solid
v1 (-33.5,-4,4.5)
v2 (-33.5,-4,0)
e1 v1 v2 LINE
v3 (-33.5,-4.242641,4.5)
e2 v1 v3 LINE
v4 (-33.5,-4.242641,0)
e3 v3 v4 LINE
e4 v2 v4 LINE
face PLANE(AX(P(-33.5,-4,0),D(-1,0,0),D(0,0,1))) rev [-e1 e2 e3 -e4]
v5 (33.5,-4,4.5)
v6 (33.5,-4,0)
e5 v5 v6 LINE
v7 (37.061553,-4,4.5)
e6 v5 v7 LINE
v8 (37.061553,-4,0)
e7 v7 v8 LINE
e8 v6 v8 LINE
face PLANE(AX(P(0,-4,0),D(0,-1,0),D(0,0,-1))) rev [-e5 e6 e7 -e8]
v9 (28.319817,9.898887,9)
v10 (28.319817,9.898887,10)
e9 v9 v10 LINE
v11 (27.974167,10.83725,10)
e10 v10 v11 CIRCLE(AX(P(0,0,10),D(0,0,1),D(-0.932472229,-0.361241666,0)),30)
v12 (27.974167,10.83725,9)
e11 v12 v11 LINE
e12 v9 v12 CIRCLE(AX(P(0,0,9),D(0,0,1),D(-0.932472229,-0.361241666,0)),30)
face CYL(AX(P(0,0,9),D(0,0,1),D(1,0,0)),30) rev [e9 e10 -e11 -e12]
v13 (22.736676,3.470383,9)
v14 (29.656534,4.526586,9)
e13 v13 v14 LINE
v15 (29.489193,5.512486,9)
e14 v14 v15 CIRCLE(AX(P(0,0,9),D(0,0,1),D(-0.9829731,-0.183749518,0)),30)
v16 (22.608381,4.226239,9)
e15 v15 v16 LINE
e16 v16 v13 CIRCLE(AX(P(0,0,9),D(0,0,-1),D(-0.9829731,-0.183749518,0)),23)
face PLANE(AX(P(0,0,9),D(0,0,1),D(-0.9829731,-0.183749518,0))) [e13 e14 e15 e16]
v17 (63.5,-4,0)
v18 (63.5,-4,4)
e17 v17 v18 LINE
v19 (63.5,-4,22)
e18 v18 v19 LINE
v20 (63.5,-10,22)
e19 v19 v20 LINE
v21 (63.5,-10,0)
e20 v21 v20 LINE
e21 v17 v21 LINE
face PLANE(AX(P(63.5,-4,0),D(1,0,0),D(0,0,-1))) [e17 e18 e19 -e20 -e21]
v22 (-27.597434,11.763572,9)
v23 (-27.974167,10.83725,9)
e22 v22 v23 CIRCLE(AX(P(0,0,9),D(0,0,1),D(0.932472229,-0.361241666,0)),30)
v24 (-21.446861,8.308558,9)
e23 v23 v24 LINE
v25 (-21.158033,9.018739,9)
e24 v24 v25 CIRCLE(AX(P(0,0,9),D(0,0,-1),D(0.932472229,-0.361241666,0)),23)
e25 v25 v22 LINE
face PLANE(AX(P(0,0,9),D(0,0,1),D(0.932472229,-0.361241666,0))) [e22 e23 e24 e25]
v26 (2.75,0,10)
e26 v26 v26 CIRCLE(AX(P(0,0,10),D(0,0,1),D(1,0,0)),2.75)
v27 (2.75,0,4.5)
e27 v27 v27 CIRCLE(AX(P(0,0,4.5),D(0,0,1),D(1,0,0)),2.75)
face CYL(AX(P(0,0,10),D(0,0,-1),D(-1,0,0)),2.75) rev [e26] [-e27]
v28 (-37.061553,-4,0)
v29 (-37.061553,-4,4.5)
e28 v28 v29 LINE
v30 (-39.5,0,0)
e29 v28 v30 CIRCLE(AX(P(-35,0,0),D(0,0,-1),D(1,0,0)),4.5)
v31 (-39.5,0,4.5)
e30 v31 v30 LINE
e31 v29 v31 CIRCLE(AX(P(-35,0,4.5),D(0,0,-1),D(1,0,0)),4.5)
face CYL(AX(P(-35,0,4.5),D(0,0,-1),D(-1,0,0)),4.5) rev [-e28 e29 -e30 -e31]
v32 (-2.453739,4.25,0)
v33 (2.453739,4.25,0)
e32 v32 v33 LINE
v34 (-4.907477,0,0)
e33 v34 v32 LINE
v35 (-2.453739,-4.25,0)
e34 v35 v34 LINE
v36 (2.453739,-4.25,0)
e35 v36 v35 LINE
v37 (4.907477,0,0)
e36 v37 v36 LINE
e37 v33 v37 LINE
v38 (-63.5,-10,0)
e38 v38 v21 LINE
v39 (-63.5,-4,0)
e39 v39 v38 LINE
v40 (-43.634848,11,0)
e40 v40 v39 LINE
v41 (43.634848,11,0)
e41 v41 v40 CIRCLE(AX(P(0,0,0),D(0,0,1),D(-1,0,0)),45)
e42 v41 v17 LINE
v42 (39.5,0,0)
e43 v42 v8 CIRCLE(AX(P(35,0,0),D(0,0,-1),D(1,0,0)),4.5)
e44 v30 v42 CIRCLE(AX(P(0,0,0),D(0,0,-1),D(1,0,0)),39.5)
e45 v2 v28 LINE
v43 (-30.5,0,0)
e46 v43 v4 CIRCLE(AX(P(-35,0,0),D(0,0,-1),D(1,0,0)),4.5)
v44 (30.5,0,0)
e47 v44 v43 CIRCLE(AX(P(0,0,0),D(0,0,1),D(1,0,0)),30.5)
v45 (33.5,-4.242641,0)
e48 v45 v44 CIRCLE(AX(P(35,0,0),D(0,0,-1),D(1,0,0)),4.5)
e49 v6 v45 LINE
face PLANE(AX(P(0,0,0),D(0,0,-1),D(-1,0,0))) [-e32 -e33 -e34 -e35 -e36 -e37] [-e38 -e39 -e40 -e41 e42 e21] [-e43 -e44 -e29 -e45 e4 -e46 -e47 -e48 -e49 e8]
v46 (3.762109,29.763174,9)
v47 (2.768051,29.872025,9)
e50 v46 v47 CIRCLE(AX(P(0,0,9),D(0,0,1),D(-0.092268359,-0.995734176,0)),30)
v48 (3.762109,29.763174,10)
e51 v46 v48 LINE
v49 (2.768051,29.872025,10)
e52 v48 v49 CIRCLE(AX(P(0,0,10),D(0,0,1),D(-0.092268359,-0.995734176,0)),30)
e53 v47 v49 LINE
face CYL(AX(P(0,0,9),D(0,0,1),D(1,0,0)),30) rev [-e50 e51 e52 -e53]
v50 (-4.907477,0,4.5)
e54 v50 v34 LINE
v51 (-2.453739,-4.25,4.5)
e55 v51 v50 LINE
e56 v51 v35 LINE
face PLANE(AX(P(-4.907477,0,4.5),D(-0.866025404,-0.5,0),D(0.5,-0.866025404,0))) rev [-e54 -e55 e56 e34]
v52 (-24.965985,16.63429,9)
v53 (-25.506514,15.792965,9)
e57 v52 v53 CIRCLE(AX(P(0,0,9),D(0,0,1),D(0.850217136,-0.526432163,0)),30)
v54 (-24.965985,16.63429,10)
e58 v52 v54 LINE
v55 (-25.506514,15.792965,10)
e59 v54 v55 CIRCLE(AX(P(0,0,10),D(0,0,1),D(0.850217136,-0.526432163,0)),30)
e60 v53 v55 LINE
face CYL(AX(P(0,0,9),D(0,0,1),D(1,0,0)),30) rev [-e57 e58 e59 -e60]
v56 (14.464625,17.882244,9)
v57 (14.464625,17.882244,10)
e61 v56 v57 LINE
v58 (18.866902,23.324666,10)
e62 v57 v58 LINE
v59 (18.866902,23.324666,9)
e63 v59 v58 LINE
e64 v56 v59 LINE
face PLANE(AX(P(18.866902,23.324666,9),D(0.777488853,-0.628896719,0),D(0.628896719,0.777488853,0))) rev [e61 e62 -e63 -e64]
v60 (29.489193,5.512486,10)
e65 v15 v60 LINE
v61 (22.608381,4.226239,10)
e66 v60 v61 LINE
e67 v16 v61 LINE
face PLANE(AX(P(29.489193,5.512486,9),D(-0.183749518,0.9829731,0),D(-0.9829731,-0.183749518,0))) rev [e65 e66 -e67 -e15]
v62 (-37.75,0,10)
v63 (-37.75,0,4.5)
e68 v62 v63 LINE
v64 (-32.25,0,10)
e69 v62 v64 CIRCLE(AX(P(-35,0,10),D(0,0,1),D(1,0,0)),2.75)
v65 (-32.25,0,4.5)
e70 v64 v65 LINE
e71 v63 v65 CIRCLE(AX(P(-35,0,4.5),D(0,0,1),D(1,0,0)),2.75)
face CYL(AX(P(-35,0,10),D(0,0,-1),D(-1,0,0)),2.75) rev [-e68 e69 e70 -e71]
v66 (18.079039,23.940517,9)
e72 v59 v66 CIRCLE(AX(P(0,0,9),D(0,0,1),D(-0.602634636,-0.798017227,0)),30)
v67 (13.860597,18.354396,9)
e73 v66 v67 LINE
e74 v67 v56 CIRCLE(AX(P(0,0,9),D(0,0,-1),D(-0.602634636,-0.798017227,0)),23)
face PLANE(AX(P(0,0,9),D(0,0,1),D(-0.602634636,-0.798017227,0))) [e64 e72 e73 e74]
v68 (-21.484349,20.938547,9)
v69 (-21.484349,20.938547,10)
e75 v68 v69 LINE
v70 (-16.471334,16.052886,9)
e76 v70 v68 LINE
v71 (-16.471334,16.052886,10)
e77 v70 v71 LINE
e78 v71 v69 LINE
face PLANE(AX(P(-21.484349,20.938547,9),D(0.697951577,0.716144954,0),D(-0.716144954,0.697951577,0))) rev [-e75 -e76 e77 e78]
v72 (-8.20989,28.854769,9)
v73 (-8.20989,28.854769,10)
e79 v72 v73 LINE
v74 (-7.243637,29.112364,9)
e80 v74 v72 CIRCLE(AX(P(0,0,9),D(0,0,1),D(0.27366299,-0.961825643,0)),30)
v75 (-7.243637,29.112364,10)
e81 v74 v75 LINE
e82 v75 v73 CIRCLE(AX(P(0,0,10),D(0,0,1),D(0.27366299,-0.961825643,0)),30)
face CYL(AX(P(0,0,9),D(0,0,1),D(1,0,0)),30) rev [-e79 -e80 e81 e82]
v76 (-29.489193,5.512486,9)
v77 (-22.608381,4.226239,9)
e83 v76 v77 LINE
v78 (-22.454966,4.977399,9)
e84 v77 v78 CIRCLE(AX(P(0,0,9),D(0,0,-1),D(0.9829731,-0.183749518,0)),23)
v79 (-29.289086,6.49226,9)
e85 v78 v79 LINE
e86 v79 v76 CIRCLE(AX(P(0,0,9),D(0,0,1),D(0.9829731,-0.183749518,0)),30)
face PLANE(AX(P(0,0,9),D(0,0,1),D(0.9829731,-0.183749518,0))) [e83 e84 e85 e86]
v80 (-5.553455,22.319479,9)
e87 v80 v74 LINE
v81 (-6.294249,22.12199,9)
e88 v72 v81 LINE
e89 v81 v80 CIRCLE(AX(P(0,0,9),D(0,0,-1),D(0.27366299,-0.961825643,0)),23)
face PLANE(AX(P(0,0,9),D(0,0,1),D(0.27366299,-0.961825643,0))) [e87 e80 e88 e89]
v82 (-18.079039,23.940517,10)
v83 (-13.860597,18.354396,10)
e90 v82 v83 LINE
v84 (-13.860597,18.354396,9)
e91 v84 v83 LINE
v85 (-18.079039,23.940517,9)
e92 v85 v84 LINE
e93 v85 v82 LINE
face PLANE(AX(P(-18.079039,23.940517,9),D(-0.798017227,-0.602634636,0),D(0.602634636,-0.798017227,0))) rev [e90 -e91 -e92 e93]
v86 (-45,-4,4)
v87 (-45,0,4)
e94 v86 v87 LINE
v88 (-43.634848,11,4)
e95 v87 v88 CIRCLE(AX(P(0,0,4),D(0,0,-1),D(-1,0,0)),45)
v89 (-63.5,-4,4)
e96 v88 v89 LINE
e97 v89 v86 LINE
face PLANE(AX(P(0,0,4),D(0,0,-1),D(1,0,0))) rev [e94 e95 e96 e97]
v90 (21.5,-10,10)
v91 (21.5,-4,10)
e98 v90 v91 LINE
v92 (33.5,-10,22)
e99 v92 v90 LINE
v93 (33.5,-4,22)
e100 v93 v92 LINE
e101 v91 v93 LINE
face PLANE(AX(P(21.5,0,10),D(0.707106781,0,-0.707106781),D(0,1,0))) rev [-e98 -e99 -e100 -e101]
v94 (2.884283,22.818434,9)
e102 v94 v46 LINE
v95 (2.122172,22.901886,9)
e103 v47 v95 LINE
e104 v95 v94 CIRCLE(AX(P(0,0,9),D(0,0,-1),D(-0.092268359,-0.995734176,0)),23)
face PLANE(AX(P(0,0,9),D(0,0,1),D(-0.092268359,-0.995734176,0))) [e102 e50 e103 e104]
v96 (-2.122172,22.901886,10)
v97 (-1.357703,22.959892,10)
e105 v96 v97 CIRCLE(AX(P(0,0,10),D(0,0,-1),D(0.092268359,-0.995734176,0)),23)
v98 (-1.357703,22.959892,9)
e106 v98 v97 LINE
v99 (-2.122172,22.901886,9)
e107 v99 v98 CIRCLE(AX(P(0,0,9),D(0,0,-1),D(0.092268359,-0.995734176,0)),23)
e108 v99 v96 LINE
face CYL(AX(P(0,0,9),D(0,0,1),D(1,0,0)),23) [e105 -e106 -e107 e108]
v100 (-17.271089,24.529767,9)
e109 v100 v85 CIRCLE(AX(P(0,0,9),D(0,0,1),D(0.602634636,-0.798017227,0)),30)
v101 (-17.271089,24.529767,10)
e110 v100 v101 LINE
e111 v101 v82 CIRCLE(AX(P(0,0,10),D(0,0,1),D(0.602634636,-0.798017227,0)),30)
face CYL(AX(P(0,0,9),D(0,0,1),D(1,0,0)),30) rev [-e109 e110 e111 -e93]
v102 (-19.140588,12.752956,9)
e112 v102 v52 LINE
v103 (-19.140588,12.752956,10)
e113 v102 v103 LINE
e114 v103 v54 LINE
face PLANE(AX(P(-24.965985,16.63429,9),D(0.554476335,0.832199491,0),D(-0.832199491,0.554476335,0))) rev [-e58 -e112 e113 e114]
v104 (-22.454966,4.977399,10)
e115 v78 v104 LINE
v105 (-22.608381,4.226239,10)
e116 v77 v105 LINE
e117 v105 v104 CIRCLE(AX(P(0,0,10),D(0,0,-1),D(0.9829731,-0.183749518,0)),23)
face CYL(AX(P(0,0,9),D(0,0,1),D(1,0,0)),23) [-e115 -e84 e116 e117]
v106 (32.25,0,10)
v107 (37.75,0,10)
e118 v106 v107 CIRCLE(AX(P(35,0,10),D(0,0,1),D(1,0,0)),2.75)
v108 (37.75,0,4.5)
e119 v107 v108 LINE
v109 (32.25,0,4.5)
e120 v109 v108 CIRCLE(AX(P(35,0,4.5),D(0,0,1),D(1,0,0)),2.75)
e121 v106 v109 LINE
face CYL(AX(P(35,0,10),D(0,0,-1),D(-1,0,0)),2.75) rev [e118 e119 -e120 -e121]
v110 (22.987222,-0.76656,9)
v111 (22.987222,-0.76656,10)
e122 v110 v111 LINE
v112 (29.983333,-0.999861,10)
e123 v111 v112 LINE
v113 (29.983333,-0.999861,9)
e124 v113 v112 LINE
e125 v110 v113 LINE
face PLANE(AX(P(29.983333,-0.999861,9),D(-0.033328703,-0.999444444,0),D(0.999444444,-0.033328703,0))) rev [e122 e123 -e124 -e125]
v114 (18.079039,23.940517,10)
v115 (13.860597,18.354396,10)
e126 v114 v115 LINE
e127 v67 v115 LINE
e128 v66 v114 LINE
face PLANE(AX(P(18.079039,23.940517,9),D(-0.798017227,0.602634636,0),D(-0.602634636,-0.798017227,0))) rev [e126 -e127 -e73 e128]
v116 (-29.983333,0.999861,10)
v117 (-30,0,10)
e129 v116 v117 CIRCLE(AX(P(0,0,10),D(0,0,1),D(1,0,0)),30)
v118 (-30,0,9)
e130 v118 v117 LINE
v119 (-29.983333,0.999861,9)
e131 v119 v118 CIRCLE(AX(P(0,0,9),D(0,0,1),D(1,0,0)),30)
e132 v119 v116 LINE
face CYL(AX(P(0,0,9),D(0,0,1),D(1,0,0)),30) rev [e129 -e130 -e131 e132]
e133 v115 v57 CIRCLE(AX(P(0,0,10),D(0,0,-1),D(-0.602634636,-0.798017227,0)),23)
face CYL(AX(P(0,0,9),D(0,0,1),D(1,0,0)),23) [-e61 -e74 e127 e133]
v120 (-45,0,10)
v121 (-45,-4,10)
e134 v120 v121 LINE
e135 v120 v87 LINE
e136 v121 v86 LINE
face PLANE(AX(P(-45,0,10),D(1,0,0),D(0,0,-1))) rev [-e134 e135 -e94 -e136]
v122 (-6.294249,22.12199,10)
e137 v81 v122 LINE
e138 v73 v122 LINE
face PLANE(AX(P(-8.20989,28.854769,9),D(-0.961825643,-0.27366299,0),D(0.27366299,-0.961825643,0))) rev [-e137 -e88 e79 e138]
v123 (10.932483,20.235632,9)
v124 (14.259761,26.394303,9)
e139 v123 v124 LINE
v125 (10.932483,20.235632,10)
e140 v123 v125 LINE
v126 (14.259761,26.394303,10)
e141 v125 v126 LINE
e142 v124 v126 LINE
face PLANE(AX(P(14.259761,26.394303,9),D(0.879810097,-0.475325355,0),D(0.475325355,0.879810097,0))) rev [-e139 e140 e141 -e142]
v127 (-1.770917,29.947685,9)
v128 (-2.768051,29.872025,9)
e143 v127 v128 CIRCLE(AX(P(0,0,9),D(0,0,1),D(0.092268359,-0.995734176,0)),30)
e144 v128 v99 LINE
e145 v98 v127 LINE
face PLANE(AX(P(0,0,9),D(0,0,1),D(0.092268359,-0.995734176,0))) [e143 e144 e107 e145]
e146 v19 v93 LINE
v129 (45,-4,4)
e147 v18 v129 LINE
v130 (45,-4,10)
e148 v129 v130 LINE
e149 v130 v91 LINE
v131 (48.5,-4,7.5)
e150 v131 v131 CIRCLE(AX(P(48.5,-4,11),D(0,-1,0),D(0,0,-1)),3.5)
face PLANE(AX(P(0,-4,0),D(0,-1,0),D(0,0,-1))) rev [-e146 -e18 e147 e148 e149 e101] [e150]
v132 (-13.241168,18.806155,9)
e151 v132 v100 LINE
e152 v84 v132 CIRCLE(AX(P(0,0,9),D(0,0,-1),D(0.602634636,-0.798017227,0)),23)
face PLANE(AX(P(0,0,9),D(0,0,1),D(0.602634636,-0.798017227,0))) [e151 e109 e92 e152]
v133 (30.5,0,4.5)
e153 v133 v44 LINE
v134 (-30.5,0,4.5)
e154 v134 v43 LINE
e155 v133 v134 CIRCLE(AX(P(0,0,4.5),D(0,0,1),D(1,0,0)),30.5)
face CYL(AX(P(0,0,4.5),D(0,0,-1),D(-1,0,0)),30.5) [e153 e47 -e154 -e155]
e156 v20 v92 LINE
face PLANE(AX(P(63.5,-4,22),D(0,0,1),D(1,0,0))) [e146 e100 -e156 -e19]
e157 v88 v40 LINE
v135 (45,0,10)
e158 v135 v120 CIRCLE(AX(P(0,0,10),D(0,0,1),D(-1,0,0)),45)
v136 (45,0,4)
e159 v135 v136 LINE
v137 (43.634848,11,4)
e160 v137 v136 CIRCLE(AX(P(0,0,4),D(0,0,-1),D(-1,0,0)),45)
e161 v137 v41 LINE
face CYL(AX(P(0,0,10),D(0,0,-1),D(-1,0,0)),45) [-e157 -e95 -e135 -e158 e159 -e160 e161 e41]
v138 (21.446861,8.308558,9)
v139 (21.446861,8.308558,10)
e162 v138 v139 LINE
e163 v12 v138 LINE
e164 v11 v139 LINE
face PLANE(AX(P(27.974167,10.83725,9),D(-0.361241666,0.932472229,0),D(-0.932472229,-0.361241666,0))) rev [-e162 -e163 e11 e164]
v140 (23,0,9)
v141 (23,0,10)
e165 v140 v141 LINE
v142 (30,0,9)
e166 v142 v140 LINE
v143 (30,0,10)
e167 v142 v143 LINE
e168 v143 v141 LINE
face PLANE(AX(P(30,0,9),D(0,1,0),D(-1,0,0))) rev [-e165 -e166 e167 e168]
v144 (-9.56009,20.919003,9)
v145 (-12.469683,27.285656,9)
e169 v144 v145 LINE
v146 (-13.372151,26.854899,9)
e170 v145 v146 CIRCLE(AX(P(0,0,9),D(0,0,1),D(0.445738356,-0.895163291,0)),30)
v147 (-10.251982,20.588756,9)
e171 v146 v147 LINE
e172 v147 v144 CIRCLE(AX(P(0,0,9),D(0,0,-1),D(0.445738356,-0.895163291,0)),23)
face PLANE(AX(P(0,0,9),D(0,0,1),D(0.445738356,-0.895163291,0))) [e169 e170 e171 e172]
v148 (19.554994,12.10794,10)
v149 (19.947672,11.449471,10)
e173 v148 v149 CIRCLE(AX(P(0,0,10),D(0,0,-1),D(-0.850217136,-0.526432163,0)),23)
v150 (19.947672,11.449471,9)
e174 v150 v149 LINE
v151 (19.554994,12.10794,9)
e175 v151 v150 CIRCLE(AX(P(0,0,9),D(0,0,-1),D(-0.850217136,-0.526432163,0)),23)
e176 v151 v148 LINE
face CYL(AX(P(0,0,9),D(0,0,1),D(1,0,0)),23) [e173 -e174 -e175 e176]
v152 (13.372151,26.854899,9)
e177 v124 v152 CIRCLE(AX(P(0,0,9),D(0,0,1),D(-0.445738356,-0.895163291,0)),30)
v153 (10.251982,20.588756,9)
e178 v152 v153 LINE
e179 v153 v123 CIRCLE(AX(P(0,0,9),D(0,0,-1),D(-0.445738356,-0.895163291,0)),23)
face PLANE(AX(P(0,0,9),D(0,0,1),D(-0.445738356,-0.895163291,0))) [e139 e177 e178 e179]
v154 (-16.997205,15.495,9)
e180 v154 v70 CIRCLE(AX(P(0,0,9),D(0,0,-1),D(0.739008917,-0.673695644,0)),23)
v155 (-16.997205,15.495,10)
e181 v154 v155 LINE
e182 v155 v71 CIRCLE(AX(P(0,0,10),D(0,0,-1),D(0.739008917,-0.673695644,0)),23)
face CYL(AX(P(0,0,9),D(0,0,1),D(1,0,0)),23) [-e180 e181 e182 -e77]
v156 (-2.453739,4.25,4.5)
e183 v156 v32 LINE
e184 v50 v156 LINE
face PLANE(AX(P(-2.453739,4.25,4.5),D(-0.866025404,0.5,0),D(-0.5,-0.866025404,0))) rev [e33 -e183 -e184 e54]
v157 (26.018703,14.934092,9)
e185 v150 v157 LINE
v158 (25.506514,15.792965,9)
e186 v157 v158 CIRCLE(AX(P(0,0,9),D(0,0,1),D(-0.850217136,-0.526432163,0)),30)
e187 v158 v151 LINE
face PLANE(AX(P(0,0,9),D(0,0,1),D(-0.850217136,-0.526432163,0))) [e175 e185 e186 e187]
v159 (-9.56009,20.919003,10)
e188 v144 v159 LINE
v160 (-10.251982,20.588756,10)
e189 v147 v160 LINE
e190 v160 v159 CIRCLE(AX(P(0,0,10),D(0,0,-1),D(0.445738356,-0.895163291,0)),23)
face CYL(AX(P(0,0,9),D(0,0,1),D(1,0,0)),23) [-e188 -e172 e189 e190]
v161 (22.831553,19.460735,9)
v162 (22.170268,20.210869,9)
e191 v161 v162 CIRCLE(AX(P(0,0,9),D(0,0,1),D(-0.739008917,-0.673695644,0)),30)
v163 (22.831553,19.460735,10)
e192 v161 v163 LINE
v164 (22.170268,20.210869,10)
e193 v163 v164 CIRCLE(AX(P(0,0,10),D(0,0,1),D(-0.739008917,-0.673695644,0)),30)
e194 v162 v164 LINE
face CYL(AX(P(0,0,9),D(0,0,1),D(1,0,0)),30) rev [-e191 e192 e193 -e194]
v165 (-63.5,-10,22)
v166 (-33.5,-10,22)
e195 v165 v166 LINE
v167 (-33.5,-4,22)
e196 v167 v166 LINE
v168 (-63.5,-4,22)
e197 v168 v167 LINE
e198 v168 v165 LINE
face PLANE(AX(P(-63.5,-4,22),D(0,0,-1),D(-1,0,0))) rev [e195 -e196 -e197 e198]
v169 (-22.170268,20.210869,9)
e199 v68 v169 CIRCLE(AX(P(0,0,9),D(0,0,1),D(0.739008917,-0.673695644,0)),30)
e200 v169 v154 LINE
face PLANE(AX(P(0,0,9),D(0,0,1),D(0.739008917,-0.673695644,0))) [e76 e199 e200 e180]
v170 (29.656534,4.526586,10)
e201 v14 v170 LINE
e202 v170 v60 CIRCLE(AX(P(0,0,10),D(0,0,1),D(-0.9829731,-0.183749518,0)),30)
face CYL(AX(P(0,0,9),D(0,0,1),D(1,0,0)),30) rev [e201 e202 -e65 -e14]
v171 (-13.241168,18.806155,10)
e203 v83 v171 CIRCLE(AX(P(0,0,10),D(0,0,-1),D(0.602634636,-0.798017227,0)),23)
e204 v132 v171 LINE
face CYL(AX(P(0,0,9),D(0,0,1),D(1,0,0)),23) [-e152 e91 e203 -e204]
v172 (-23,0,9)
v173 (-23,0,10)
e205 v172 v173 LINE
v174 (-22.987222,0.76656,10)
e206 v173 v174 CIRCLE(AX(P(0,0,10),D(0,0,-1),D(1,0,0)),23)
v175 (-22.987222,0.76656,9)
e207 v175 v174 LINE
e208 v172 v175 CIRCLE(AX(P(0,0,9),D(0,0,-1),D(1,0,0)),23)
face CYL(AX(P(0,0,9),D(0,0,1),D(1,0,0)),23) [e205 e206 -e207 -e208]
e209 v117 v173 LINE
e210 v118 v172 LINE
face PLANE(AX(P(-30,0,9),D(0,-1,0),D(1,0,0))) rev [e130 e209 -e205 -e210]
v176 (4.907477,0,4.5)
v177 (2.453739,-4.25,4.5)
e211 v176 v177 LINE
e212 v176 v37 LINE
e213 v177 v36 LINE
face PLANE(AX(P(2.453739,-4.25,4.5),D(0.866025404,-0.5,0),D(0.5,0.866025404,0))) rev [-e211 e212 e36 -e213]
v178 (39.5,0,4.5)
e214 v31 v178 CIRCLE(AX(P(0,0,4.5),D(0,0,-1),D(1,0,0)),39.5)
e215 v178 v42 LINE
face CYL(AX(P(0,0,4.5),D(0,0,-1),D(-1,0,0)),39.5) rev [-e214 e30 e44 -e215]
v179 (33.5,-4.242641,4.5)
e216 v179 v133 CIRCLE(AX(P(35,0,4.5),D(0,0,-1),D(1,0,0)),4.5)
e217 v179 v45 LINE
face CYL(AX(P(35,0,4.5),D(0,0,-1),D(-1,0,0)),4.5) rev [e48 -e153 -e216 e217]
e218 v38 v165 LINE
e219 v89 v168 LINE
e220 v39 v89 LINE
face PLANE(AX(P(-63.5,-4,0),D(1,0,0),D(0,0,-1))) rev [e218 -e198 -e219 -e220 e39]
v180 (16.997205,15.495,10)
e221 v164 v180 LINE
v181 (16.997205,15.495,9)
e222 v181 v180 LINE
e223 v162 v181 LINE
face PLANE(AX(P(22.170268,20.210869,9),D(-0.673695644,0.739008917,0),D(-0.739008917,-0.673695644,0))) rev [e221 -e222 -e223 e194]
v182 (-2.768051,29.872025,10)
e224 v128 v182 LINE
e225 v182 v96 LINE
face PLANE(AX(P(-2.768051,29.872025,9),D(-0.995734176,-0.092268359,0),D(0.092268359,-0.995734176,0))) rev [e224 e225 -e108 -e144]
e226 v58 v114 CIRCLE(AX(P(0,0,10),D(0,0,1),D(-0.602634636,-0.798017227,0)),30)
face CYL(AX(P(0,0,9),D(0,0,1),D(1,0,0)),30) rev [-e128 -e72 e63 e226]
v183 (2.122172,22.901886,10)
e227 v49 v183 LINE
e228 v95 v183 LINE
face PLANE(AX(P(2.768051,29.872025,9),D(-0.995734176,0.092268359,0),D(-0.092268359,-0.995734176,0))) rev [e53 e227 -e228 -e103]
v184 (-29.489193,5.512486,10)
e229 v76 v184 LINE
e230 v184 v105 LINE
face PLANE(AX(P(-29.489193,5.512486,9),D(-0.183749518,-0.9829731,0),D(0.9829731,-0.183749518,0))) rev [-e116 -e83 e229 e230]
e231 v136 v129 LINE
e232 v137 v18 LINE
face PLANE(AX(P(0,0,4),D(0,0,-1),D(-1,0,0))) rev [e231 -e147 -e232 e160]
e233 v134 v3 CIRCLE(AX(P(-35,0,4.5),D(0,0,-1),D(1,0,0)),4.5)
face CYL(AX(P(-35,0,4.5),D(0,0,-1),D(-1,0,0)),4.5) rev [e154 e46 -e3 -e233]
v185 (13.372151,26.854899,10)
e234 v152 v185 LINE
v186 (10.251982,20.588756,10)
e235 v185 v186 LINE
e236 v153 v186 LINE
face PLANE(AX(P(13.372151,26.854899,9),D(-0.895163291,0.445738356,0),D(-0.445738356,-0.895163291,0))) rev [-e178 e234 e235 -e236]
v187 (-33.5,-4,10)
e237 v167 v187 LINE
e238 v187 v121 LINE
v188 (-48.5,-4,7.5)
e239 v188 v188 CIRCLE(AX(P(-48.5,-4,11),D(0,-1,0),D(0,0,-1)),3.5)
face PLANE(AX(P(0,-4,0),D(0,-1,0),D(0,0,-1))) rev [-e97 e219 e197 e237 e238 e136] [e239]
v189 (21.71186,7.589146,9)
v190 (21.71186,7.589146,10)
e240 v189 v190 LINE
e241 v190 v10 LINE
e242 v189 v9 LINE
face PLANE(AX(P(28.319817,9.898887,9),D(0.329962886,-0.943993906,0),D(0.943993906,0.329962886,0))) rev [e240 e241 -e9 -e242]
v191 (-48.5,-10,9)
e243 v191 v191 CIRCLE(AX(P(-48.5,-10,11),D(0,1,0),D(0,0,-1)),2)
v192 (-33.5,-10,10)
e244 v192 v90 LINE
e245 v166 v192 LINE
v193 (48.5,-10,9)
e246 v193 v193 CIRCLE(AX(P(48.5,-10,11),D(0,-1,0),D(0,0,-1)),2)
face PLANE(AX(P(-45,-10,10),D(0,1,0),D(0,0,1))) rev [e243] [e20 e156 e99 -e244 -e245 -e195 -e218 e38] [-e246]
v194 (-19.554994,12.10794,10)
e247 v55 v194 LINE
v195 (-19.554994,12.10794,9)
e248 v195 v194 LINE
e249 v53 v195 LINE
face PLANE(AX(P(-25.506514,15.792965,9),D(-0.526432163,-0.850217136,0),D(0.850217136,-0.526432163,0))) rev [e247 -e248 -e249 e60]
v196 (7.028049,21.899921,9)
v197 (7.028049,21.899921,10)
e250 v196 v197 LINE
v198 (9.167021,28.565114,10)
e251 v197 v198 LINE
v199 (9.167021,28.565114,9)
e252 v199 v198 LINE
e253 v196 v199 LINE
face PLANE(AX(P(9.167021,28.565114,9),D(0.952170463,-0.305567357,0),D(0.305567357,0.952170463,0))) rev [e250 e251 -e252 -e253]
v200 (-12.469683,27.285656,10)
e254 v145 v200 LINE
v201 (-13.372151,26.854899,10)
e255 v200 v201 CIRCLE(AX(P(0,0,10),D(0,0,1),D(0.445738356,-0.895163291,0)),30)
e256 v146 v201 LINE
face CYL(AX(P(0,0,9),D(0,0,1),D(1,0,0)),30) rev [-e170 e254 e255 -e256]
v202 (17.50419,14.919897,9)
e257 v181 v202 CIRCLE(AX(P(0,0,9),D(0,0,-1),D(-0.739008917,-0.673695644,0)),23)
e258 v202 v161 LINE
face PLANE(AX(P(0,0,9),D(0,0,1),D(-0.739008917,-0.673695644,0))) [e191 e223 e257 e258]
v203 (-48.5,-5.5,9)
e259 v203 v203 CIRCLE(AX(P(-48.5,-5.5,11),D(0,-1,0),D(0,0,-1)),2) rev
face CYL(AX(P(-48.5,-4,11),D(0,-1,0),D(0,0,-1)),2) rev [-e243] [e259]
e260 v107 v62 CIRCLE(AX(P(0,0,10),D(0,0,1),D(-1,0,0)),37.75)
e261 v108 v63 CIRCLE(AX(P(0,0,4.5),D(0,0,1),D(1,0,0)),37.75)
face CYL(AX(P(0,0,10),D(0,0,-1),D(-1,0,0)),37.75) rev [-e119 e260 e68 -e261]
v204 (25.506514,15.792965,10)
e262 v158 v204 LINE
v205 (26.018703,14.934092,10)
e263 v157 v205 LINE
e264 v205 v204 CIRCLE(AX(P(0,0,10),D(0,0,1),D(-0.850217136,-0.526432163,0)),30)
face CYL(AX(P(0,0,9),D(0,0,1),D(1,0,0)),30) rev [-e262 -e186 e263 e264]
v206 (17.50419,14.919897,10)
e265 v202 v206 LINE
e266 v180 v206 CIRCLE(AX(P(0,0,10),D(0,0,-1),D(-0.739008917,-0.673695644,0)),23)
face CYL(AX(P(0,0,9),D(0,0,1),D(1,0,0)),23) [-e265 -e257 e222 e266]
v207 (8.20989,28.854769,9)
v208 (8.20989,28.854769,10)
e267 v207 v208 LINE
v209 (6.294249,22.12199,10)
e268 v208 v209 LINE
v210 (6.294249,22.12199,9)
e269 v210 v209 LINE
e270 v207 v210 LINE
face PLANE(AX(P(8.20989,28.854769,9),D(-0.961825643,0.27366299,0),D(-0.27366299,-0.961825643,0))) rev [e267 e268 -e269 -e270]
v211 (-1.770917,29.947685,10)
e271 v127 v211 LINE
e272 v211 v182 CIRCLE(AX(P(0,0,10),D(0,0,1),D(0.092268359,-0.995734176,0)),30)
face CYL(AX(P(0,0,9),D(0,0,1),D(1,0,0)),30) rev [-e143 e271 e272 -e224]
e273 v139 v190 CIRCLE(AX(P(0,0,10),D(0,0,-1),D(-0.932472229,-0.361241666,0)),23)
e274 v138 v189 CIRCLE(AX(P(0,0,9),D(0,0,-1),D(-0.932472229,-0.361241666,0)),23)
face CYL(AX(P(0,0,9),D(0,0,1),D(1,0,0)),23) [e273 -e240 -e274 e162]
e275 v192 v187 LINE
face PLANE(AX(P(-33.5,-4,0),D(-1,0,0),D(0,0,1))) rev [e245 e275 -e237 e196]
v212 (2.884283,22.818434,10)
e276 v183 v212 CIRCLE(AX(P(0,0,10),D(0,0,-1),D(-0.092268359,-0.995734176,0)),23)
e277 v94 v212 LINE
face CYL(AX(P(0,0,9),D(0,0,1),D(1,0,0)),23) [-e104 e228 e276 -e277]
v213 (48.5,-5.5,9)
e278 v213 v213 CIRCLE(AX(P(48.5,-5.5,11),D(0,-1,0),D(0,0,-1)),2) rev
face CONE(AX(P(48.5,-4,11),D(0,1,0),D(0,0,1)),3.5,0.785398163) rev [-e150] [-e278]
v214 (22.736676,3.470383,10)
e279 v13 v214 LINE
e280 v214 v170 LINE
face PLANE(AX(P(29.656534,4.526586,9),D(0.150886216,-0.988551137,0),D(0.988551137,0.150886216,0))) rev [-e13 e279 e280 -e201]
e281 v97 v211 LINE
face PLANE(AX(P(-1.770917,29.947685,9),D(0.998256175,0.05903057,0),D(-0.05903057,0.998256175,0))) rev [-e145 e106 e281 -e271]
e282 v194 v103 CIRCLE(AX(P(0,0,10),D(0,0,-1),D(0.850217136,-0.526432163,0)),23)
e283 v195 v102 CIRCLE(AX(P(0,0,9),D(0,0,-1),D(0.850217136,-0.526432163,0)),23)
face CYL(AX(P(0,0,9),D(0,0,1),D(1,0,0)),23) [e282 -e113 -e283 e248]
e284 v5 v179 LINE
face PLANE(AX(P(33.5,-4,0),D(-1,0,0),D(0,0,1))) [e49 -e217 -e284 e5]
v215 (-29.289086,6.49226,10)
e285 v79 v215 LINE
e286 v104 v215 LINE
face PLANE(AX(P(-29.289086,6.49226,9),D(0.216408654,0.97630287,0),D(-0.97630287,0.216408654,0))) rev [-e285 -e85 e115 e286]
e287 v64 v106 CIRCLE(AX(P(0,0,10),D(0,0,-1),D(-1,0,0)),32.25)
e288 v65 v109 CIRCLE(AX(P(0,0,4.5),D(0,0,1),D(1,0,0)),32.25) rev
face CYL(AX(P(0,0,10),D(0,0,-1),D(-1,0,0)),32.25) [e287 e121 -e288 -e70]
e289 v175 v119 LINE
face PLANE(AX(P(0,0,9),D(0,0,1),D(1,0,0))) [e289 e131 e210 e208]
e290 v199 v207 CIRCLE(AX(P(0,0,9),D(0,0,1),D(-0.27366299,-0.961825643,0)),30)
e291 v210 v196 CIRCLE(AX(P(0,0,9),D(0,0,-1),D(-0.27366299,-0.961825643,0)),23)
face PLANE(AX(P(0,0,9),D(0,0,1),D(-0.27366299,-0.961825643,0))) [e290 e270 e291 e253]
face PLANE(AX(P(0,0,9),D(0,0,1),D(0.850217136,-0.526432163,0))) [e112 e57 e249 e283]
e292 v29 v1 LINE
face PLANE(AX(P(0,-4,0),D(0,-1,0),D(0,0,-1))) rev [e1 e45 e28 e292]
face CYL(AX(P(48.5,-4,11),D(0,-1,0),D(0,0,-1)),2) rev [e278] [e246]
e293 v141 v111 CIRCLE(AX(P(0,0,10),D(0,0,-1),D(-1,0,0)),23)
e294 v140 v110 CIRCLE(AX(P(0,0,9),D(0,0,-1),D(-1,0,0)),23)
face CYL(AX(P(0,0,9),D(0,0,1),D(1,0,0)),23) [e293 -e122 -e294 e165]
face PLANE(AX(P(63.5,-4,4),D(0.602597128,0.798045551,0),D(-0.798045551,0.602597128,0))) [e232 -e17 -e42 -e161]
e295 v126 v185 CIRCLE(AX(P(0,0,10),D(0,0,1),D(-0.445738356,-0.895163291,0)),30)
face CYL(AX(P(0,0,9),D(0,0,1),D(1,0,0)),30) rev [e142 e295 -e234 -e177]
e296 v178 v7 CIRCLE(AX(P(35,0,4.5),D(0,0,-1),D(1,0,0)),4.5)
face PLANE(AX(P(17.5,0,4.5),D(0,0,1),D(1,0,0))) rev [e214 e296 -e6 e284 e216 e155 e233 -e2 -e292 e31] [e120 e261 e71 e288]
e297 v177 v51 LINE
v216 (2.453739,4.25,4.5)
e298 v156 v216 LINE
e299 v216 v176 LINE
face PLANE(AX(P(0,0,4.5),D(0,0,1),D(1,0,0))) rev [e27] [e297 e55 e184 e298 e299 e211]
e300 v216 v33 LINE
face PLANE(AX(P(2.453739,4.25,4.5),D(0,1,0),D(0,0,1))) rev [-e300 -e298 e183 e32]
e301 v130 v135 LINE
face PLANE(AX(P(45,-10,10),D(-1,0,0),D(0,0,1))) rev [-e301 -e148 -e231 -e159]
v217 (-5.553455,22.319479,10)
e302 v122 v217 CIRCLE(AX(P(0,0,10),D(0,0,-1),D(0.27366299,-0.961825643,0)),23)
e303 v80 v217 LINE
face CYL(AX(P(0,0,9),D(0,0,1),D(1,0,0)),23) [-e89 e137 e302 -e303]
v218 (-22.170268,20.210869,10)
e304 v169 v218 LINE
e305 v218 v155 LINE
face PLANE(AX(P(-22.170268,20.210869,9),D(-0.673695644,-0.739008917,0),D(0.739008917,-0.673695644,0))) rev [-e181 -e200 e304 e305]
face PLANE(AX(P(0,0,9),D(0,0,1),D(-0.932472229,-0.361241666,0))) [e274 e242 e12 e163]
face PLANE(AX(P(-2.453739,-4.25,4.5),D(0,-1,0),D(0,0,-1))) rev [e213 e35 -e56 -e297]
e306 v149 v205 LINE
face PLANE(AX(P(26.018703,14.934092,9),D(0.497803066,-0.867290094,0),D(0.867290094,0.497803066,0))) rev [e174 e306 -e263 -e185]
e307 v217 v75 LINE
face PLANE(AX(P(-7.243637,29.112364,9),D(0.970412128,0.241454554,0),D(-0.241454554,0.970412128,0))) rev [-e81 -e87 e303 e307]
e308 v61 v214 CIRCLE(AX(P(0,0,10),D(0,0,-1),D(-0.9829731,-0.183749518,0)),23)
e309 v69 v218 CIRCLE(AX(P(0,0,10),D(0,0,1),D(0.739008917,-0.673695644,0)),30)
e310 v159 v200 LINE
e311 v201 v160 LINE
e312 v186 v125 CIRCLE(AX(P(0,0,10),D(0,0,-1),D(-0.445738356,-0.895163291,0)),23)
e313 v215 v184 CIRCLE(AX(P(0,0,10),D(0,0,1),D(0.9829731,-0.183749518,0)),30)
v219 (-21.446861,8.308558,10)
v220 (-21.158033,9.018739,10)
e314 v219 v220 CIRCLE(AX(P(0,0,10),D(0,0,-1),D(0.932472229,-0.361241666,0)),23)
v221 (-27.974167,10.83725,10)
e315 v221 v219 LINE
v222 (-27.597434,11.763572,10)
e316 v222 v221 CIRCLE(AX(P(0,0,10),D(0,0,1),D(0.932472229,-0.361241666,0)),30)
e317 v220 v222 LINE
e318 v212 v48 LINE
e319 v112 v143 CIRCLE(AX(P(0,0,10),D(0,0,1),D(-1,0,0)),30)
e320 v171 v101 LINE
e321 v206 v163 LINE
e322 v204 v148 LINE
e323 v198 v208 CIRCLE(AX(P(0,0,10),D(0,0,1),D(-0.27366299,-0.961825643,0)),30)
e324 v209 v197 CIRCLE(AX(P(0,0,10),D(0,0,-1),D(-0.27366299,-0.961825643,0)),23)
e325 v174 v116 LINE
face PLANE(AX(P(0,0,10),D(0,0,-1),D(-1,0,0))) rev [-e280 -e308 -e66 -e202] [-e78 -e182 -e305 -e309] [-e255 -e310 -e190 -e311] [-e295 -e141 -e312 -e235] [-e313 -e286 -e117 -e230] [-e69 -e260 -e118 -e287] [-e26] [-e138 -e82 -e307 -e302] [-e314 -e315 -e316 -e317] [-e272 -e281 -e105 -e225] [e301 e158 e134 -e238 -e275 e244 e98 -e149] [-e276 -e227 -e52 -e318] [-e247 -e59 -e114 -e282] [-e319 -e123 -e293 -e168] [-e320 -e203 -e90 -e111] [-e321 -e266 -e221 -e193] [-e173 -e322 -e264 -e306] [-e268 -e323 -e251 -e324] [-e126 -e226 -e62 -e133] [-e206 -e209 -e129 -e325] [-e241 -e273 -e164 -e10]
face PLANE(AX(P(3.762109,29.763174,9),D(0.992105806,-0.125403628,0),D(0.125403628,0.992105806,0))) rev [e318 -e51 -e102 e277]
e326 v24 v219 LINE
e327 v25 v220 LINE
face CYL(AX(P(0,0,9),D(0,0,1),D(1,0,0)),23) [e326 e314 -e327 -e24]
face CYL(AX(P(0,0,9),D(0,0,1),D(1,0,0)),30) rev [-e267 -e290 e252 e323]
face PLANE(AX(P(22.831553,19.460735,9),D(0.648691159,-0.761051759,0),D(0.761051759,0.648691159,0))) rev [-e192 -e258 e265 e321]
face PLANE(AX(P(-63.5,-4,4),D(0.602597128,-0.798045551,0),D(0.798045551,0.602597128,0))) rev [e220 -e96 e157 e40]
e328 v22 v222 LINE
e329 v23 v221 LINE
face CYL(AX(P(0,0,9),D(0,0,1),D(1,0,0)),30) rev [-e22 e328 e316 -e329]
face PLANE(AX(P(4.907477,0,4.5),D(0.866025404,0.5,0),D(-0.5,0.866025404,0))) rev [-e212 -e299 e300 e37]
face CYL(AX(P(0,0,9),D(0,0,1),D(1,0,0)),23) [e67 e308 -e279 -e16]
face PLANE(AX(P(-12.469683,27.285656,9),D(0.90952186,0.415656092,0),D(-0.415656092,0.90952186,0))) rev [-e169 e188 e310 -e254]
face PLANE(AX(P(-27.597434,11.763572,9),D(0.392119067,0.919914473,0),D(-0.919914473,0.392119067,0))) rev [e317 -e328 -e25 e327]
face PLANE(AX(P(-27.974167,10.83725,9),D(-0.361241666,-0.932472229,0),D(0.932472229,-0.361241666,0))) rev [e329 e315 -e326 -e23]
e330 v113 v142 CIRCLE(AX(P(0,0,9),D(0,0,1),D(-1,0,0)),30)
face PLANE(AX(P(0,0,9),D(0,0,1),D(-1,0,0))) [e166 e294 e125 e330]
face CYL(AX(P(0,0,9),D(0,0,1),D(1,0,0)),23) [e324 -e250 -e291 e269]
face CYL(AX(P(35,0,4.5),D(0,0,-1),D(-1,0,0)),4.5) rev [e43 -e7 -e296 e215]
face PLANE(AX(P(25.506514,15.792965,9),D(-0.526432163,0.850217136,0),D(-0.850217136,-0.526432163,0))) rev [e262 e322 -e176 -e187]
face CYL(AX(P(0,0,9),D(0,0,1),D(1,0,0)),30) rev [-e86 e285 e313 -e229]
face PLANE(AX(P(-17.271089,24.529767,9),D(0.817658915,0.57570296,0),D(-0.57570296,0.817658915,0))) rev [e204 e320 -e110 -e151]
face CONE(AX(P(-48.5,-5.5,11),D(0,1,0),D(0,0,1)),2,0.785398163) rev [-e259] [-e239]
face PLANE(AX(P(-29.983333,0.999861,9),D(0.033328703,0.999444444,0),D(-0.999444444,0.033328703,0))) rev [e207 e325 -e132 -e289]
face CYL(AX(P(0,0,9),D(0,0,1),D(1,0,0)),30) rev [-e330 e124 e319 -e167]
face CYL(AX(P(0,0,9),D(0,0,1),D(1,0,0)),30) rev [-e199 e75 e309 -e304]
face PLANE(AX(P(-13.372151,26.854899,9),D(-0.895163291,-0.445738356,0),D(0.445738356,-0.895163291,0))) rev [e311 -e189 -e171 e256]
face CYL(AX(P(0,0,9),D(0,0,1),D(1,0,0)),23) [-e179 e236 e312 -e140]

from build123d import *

# Parameters (mm, degrees)
SKETCH1_R                = 2.75
BOSS_EXTRUDE1_DEPTH      = 10
CUT_EXTRUDE1_DEPTH       = 4.5
CUT_EXTRUDE2_DEPTH       = 1
CIRPATTERN1_COUNT        = 18
CIRPATTERN1_ANGLE        = 180
SKETCH4_W                = 30
SKETCH4_H                = 22
SKETCH4_R                = 2
BOSS_EXTRUDE2_DEPTH      = 6
CHAMFER3_SIZE            = 12
BOSS_EXTRUDE3_DEPTH      = 4
CHAMFER4_SIZE            = 1.5
CHAMFER4_OF_MIRROR1_SIZE = 1.5


with BuildPart() as part:
    # Sketch1 → Boss-Extrude1 (new body)
    with BuildSketch(Plane.XY):
        with BuildLine():
            Line((-45, 0), (-45, -10))
            Line((-45, -10), (45, -10))
            Line((45, -10), (45, 0))
            ThreePointArc((45, 0), (0, 45), (-45, 0))
        make_face()
        Circle(SKETCH1_R, mode=Mode.SUBTRACT)
        with BuildLine():
            ThreePointArc((-32.25, 0), (0, 32.25), (32.25, 0))
            ThreePointArc((32.25, 0), (35, -2.75), (37.75, 0))
            ThreePointArc((37.75, 0), (0, 37.75), (-37.75, 0))
            ThreePointArc((-37.75, 0), (-35, -2.75), (-32.25, 0))
        make_face(mode=Mode.SUBTRACT)
    extrude(amount=BOSS_EXTRUDE1_DEPTH)

    # Sketch2 → Cut-Extrude1 (cut)
    with BuildSketch(Plane(origin=(0, 0, 0), x_dir=(-1, 0, 0), z_dir=(0, 0, -1))):
        Polygon((4.907477288, 0), (2.453738644, -4.25), (-2.453738644, -4.25), (-4.907477288, 0), (-2.453738644, 4.25), (2.453738644, 4.25), align=None)
        with BuildLine():
            ThreePointArc((-30.5, 0), (0, 30.5), (30.5, 0))
            ThreePointArc((30.5, 0), (35, -4.5), (39.5, 0))
            ThreePointArc((39.5, 0), (0, 39.5), (-39.5, 0))
            ThreePointArc((-39.5, 0), (-35, -4.5), (-30.5, 0))
        make_face()
    extrude(amount=-CUT_EXTRUDE1_DEPTH, mode=Mode.SUBTRACT)

    # Sketch3 → Cut-Extrude2 (cut)
    with BuildSketch(Plane.XY.offset(10)):
        with BuildLine():
            Line((-29.983333333, 0.999861101), (-22.987222222, 0.766560178))
            ThreePointArc((-22.987222222, 0.766560178), (-22.996805334, 0.383333333), (-23, 0))
            Line((-23, 0), (-30, 0))
            ThreePointArc((-30, 0), (-29.995833044, 0.5), (-29.983333333, 0.999861101))
        make_face()
    cut_extrude2 = extrude(amount=-CUT_EXTRUDE2_DEPTH, mode=Mode.SUBTRACT)

    # CirPattern1: Cut-Extrude2 ×18 about axis
    cirpattern1_axis = Axis((0, 0, 0), (0, 0, -1))
    for i in range(1, CIRPATTERN1_COUNT):
        add(cut_extrude2.rotate(cirpattern1_axis, i * CIRPATTERN1_ANGLE / (CIRPATTERN1_COUNT - 1)), mode=Mode.SUBTRACT)

    # Sketch4 → Boss-Extrude2 (add)
    with BuildSketch(Plane.XZ.offset(10)):
        with Locations((48.5, 11)):
            Rectangle(SKETCH4_W, SKETCH4_H)
        with Locations(Location((48.5, 11, 0), (0, 0, 270))):
            Circle(SKETCH4_R, mode=Mode.SUBTRACT)
    boss_extrude2 = extrude(amount=-BOSS_EXTRUDE2_DEPTH)

    # Chamfer3
    chamfer3_edges = [part.edges().sort_by_distance(p)[0] for p in [
        (33.5, -7, 10),
    ]]
    chamfer(chamfer3_edges, length=CHAMFER3_SIZE - 0.0001)  # a hair under: the kernel refuses the full size

    # Sketch5 → Boss-Extrude3 (add)
    with BuildSketch(Plane(origin=(0, 0, 0), x_dir=(-1, 0, 0), z_dir=(0, 0, -1))):
        Polygon((-63.5, -4), (-43.634848459, 11), (-43.634848459, -4), align=None)
    boss_extrude3 = extrude(amount=-BOSS_EXTRUDE3_DEPTH)

    # Chamfer4
    chamfer4_edges = [part.edges().sort_by_distance(p)[0] for p in [
        (48.5, -4, 13),
    ]]
    chamfer(chamfer4_edges, length=CHAMFER4_SIZE)

    # Mirror1: Boss-Extrude2, Boss-Extrude3 across plane
    add(boss_extrude2.mirror(Plane(origin=(0, 0, 0), x_dir=(0, 0, 1), z_dir=(1, 0, 0))))
    add(boss_extrude3.mirror(Plane(origin=(0, 0, 0), x_dir=(0, 0, 1), z_dir=(1, 0, 0))))

    # Chamfer4 of Mirror1
    chamfer4_of_mirror1_edges = [part.edges().sort_by_distance(p)[0] for p in [
        (-48.5, -4, 13),
    ]]
    chamfer(chamfer4_of_mirror1_edges, length=CHAMFER4_OF_MIRROR1_SIZE)


solid = part.part
